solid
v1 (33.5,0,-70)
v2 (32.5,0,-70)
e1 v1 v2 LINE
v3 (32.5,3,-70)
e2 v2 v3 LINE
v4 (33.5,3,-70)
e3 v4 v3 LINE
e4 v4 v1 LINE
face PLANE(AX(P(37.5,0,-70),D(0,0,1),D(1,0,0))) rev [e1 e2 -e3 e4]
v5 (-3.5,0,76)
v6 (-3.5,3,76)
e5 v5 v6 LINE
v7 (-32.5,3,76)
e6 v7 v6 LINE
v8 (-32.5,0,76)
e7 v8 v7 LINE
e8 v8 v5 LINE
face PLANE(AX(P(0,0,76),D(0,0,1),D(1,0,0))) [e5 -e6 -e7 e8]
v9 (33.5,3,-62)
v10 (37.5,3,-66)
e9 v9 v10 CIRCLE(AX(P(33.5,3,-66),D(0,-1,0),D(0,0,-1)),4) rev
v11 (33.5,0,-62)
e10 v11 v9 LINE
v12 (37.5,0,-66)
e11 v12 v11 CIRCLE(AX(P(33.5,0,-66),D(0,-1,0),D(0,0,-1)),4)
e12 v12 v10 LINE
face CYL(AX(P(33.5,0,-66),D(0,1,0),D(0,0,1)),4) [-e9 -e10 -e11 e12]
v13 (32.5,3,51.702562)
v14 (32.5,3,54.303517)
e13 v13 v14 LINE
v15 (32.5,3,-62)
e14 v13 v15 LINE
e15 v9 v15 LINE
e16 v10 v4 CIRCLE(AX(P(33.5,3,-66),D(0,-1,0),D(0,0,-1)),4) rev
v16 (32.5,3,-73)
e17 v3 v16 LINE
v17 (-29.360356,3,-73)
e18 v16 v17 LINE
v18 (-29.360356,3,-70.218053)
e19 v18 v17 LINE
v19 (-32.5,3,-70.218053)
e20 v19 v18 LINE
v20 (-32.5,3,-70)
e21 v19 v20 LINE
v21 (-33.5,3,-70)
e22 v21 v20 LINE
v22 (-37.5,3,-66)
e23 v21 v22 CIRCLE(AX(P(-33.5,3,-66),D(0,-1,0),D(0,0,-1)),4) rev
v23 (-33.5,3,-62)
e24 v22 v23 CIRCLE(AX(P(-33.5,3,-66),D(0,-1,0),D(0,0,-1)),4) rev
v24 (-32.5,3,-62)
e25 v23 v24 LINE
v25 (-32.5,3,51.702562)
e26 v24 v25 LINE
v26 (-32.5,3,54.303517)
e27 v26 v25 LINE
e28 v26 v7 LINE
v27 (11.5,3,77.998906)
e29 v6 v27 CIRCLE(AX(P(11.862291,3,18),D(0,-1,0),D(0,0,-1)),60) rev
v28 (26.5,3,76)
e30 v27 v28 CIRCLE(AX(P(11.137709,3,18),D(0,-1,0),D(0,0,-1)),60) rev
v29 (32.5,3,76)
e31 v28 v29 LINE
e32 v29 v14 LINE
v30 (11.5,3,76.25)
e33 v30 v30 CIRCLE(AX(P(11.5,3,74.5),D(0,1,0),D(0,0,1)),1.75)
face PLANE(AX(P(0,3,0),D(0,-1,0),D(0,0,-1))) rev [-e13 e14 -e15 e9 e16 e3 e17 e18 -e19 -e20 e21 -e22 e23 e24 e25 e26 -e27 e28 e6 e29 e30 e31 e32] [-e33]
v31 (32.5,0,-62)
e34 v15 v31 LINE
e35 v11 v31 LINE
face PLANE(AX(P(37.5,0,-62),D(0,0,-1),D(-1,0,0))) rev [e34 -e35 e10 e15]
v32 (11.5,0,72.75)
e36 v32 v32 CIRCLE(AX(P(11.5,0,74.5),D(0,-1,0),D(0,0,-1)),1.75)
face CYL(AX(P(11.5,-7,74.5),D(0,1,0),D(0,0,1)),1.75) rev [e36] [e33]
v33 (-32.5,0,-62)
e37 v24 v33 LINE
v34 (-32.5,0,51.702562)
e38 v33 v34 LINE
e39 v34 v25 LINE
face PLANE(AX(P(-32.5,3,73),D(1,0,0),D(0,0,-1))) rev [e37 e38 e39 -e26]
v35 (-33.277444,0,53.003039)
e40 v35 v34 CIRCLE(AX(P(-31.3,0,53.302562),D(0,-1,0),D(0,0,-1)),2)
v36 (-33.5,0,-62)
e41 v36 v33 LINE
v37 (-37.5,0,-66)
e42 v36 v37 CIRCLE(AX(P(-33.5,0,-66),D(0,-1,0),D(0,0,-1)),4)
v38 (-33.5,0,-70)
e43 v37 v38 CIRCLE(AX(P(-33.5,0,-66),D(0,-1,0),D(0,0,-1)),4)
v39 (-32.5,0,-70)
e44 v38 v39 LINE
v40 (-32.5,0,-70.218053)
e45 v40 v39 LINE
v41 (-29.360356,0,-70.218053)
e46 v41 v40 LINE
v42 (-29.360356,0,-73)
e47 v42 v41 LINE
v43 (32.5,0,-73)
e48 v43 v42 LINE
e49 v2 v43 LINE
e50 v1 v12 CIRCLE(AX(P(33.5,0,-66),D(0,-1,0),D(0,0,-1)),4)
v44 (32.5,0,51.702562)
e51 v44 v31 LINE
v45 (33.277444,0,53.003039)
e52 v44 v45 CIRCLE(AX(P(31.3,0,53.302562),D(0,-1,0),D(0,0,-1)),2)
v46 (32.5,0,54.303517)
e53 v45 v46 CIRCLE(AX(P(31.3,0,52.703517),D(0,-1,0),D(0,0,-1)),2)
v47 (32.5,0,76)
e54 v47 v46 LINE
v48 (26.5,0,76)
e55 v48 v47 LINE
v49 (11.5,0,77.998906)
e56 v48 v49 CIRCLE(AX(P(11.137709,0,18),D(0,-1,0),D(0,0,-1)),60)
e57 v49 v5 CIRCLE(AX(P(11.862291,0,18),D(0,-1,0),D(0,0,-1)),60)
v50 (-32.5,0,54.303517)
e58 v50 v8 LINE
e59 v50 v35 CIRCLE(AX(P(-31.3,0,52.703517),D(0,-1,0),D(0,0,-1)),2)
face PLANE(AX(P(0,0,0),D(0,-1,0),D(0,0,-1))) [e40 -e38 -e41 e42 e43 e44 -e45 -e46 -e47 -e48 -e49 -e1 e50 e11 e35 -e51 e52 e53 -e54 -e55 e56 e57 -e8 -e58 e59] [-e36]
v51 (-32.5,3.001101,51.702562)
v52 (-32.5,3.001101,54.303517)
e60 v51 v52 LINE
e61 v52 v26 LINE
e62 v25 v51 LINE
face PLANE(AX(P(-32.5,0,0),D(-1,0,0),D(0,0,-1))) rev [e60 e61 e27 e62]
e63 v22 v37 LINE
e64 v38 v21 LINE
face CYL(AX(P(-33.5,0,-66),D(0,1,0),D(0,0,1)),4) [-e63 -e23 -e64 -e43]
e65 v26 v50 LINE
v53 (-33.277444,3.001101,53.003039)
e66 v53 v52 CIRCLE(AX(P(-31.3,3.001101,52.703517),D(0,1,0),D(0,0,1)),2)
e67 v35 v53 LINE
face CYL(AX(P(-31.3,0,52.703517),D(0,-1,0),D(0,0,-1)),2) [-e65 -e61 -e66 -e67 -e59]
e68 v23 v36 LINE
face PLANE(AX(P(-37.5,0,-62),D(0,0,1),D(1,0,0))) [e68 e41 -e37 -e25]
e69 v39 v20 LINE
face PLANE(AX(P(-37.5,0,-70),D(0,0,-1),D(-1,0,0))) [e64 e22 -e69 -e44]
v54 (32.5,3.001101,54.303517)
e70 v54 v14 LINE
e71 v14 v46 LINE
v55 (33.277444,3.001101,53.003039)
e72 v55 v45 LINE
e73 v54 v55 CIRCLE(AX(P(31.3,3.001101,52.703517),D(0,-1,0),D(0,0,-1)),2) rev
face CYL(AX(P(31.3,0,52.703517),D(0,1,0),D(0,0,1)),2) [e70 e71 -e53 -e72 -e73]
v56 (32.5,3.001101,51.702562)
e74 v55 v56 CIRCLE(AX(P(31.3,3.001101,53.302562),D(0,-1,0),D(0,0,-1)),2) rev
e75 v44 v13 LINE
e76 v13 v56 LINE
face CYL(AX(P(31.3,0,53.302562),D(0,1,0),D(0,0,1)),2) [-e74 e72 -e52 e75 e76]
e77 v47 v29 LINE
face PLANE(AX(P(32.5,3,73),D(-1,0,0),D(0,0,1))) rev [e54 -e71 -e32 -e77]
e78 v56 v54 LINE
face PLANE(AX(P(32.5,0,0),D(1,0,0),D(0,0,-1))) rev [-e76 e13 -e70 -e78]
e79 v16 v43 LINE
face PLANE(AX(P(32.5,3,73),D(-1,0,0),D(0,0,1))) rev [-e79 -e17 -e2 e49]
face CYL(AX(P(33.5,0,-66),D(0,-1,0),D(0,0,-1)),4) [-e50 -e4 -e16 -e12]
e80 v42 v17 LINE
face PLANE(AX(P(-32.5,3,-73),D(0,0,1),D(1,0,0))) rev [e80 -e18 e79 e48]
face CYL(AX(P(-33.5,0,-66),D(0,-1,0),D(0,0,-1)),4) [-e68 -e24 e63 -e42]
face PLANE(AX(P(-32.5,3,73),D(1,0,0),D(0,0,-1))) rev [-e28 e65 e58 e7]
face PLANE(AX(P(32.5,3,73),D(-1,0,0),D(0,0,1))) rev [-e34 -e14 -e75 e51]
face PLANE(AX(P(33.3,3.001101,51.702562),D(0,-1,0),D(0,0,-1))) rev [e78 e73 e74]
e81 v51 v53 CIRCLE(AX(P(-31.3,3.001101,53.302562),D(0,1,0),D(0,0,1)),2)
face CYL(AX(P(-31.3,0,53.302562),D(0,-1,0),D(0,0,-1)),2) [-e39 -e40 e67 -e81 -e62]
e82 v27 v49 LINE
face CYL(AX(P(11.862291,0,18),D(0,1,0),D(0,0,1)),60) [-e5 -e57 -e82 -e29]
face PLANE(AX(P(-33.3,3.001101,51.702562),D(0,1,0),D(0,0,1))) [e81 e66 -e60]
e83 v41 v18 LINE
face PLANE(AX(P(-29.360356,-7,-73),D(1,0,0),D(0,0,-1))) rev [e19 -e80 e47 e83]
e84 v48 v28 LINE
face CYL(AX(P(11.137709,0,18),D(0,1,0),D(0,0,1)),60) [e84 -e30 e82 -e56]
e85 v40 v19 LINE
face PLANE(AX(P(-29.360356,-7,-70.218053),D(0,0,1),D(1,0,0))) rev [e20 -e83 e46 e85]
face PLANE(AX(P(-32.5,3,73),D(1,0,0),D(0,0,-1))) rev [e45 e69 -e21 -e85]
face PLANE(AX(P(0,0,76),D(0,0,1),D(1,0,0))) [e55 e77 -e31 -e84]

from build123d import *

# Parameters (mm, degrees)
CROQUIS1_W               = 65
CROQUIS1_H               = 146
SALIENTE_EXTRUIR1_DEPTH  = 3
CROQUIS2_W               = 8
CROQUIS2_H               = 3
SALIENTE_EXTRUIR2_DEPTH  = 5
REDONDEO1_R              = 4
REDONDEO1_OF_SIMETR_A1_R = 4
CROQUIS3_W               = 2.60095456
CROQUIS3_H               = 3.001101416
SALIENTE_EXTRUIR3_DEPTH  = 0.8
REDONDEO2_R              = 2
REDONDEO2_OF_SIMETR_A5_R = 2
CROQUIS4_W               = 65
CROQUIS4_H               = 3
CROQUIS4_W_2             = 30
CROQUIS4_H_2             = 2
SALIENTE_EXTRUIR4_DEPTH  = 3
REDONDEO3_R              = 60
CROQUIS6_W               = 3.139643751
CROQUIS6_H               = 2.781946526
CORTAR_EXTRUIR1_DEPTH    = 10
CROQUIS8_R               = 1.75
CORTAR_EXTRUIR2_DEPTH    = 10


# Some blends are built 0.0001 mm under size
with BuildPart() as part:
    # Croquis1 → Saliente-Extruir1 (new body)
    with BuildSketch(Plane(origin=(0, 0, 0), x_dir=(1, 0, 0), z_dir=(0, 1, 0))):
        Rectangle(CROQUIS1_W, CROQUIS1_H)
    extrude(amount=SALIENTE_EXTRUIR1_DEPTH)

    # Croquis2 → Saliente-Extruir2 (add)
    with BuildSketch(Plane(origin=(32.5, 0, 0), x_dir=(0, 0, -1), z_dir=(1, 0, 0))):
        with Locations((66, 1.5)):
            Rectangle(CROQUIS2_W, CROQUIS2_H)
    saliente_extruir2 = extrude(amount=SALIENTE_EXTRUIR2_DEPTH)

    # Redondeo1
    redondeo1_edges = [part.edges().sort_by_distance(p)[0] for p in [
        (37.5, 1.5, -62),
        (37.5, 1.5, -70),
    ]]
    fillet(redondeo1_edges, radius=REDONDEO1_R - 0.0001)  # a hair under: the kernel refuses the full size

    # Simetría1: Saliente-Extruir2 across plane
    add(saliente_extruir2.mirror(Plane(origin=(0, 0, 0), x_dir=(0, 0, 1), z_dir=(1, 0, 0))))

    # Redondeo1 of Simetría1
    redondeo1_of_simetr_a1_edges = [part.edges().sort_by_distance(p)[0] for p in [
        (-37.5, 1.5, -62),
        (-37.5, 1.5, -70),
    ]]
    fillet(redondeo1_of_simetr_a1_edges, radius=REDONDEO1_OF_SIMETR_A1_R - 0.0001)  # a hair under: the kernel refuses the full size

    # Croquis3 → Saliente-Extruir3 (add)
    with BuildSketch(Plane(origin=(32.5, 0, 0), x_dir=(0, 0, -1), z_dir=(1, 0, 0))):
        with Locations((-53.003039433, 1.500550708)):
            Rectangle(CROQUIS3_W, CROQUIS3_H)
    saliente_extruir3 = extrude(amount=SALIENTE_EXTRUIR3_DEPTH)

    # Redondeo2
    # the kernel refuses this fillet: 2 mm, written as the material it takes off along each edge
    with BuildSketch(Plane(origin=(33.3, 7.001101416, 51.702562153), x_dir=(-1, 0, 0), z_dir=(0, -1, 0)), Plane(origin=(33.3, -4, 54.303516713), x_dir=(-1, 0, 0), z_dir=(0, 1, 0))) as redondeo2_piece_1:
        with BuildLine():
            CenterArc((2, -1.6), REDONDEO2_R, 126.869897646, 53.130102354)
            Line((0, -1.6), (-0.04, -1.6))
            Line((-0.04, -1.6), (-0.04, 0))
            Line((-0.04, 0), (0, 0.04))
            ThreePointArc((0, 0.04), (0.4, 0.04), (0.776, 0.032))
            Line((0.776, 0.032), (0.8, 0))
        make_face()
    extrude(amount=11.001101416, mode=Mode.SUBTRACT)

    # Simetría5: Saliente-Extruir3 across plane
    add(saliente_extruir3.mirror(Plane(origin=(0, 0, 0), x_dir=(0, 0, 1), z_dir=(1, 0, 0))))

    # Redondeo2 of Simetría5
    # the kernel refuses this fillet: 2 mm, written as the material it takes off along each edge
    with BuildSketch(Plane(origin=(-33.3, 7.001101416, 51.702562153), x_dir=(1, 0, 0), z_dir=(0, -1, 0)), Plane(origin=(-33.3, -4, 54.303516713), x_dir=(1, 0, 0), z_dir=(0, 1, 0))) as redondeo2_of_simetr_a5_piece_1:
        with BuildLine():
            CenterArc((2, 1.6), REDONDEO2_OF_SIMETR_A5_R, 180, 53.130102354)
            Line((0, 1.6), (-0.04, 1.6))
            Line((-0.04, 1.6), (-0.04, 0))
            Line((-0.04, 0), (0, -0.04))
            ThreePointArc((0, -0.04), (0.4, -0.04), (0.776, -0.032))
            Line((0.776, -0.032), (0.8, 0))
        make_face()
    extrude(amount=11.001101416, mode=Mode.SUBTRACT)

    # Croquis4 → Saliente-Extruir4 (add)
    with BuildSketch(Plane(origin=(0, 3, 0), x_dir=(1, 0, 0), z_dir=(0, 1, 0))):
        with Locations((0, -74.5)):
            Rectangle(CROQUIS4_W, CROQUIS4_H)
        with Locations((11.5, -77)):
            Rectangle(CROQUIS4_W_2, CROQUIS4_H_2)
    extrude(amount=-SALIENTE_EXTRUIR4_DEPTH)

    # Redondeo3
    # the kernel refuses this fillet: 60 mm, written as the material it takes off along each edge
    with BuildSketch(Plane(origin=(26.5, 41.405728739, 78), x_dir=(0, 0, -1), z_dir=(0, -1, 0))) as redondeo3_piece_1:
        with BuildLine():
            CenterArc((60, -15.362291496), REDONDEO3_R, 165.164888418, 14.835111582)
            Line((0, -15.362291496), (0, 0))
            Line((0, 0), (2, 0))
        make_face()
    extrude(amount=79.811457479, mode=Mode.SUBTRACT)
    with BuildSketch(Plane(origin=(-3.5, 41.405728739, 78), x_dir=(1, 0, 0), z_dir=(0, -1, 0))) as redondeo3_piece_2:
        with BuildLine():
            CenterArc((15.362291496, -60), REDONDEO3_R, 90, 14.835111582)
            Line((0, -2), (0, 0))
            Line((0, 0), (15.362291496, 0))
        make_face()
    extrude(amount=79.811457479, mode=Mode.SUBTRACT)

    # Croquis6 → Cortar-Extruir1 (cut)
    with BuildSketch(Plane(origin=(0, 3, 0), x_dir=(1, 0, 0), z_dir=(0, 1, 0))):
        with Locations((-30.930178125, 71.609026737)):
            Rectangle(CROQUIS6_W, CROQUIS6_H)
    extrude(amount=-CORTAR_EXTRUIR1_DEPTH, mode=Mode.SUBTRACT)

    # Croquis8 → Cortar-Extruir2 (cut)
    with BuildSketch(Plane(origin=(0, 3, 0), x_dir=(1, 0, 0), z_dir=(0, 1, 0))):
        with Locations(Location((11.5, -74.5, 0), (0, 0, 270))):
            Circle(CROQUIS8_R)
    extrude(amount=-CORTAR_EXTRUIR2_DEPTH, mode=Mode.SUBTRACT)


solid = part.part
